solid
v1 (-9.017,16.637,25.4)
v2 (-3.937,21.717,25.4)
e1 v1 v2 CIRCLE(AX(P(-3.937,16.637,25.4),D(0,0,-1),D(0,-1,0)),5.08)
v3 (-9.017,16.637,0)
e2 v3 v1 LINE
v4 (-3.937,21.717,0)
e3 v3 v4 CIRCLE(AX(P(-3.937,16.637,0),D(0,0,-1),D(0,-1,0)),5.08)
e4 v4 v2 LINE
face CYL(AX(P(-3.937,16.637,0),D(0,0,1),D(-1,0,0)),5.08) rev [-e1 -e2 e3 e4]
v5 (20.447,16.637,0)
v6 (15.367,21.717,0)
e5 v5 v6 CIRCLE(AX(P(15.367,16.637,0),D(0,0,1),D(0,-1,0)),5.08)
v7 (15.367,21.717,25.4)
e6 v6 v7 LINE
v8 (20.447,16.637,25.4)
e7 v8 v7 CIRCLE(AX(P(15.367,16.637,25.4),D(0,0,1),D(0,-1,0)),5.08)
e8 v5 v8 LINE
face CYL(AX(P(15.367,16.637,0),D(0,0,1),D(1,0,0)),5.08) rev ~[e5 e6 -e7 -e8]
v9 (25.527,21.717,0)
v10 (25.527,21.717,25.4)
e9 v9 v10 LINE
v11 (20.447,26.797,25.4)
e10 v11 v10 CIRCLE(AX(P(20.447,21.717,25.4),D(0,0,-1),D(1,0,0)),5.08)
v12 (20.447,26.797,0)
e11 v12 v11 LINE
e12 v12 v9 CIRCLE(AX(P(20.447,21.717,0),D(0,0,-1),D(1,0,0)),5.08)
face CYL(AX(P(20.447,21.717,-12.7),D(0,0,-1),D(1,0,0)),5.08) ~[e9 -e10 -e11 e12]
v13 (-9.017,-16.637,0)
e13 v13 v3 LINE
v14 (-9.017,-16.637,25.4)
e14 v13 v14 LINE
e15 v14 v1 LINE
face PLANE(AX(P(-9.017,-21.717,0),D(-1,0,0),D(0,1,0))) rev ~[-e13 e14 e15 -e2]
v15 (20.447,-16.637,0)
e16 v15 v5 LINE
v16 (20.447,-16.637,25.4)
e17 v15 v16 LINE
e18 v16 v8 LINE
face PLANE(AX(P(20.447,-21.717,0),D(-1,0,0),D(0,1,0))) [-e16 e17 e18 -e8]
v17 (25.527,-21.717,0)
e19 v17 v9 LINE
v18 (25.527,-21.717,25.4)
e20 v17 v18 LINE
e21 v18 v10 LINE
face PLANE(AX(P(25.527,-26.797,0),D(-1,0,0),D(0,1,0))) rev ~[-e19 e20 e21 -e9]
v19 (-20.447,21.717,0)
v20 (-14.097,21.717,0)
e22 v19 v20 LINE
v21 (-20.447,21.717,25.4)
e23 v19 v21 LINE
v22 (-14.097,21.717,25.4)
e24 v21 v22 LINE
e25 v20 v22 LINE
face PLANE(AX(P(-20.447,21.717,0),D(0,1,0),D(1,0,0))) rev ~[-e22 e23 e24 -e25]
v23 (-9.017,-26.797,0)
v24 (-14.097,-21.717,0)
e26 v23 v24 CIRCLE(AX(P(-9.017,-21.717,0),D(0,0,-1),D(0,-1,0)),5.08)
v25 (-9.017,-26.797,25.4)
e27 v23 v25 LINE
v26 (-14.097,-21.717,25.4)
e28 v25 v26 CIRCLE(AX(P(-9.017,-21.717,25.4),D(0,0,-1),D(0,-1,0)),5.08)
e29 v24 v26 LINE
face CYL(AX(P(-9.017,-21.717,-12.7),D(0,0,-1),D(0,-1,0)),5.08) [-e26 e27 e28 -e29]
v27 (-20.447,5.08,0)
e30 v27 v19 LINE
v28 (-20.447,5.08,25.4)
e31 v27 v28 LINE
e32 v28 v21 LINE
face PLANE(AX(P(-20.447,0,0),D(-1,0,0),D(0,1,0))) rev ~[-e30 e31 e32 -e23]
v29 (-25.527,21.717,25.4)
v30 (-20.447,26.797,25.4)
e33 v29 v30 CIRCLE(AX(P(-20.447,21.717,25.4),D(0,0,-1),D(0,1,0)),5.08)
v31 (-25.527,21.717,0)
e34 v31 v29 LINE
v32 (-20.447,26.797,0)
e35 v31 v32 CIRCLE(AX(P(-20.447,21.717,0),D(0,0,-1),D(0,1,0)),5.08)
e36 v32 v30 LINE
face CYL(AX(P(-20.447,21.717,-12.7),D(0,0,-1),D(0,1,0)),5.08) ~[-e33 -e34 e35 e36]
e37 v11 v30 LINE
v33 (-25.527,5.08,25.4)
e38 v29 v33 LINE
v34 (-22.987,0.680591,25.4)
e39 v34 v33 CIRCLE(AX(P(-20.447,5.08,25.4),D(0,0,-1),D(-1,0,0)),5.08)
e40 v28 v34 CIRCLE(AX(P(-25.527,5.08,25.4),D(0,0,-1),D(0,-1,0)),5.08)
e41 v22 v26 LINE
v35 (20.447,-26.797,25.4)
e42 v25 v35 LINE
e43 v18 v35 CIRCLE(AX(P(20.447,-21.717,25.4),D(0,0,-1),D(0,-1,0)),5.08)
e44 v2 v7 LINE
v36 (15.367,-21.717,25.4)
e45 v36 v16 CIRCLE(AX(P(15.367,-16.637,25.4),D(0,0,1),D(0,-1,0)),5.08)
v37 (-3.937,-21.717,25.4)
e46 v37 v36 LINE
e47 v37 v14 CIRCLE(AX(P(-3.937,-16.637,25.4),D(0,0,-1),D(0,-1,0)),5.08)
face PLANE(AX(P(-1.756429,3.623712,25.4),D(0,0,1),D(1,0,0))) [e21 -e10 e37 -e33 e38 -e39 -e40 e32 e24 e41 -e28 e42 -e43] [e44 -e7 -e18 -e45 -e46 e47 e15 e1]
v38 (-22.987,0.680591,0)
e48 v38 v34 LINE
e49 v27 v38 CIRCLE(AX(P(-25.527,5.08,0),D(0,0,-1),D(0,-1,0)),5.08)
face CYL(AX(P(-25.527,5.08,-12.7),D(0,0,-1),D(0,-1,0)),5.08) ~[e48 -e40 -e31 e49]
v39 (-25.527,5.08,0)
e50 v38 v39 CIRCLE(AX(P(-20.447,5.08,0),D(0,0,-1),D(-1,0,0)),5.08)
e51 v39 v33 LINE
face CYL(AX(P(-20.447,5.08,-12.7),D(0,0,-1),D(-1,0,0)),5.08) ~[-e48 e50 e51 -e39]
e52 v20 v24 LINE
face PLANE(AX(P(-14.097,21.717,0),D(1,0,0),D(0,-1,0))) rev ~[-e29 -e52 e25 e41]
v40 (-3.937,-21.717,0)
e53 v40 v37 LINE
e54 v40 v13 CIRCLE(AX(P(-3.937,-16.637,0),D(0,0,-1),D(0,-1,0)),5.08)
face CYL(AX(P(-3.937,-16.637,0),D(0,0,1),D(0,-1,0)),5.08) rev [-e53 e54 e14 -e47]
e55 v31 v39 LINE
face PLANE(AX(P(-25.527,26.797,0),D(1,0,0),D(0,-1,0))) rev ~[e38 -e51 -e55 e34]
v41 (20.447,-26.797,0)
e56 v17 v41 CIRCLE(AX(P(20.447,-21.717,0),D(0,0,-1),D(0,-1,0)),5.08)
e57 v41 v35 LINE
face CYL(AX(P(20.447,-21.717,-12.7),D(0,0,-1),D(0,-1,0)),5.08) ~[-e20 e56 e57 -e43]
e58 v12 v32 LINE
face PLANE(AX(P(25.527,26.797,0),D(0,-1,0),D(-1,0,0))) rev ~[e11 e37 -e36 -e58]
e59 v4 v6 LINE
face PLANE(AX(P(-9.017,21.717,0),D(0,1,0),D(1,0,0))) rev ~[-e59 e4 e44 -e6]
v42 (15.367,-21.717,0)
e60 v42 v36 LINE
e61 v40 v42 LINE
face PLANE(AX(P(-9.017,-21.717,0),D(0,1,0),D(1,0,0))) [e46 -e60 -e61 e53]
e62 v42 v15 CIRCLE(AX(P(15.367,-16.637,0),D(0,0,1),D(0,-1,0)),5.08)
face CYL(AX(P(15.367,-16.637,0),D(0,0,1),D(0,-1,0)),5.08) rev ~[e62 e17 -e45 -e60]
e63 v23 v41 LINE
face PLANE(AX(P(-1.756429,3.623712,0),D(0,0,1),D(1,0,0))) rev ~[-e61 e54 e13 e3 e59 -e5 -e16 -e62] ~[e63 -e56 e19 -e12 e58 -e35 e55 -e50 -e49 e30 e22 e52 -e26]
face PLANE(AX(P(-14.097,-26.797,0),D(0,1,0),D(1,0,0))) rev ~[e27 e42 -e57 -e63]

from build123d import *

# Parameters (mm, degrees)
F0_W        = 29.464
F0_H        = 43.434
F1_DEPTH    = 25.4
F2_T1_DEPTH = 50.8
F3_R        = 5.08


# Not quite as in the source:
# - a fillet or chamfer that OpenCascade refuses, or shapes differently, is made with other operations: its cross-section is extruded or revolved along the edge and cut away or added


with BuildPart() as f1:
    # F0 (on Top) → F1 (new body)
    with BuildSketch(Plane.XY):
        Polygon((25.527, -26.797), (25.527, 26.797), (-25.527, 26.797), (-25.527, 0), (-20.447, 0), (-20.447, 21.717), (-14.097, 21.717), (-14.097, -26.797), align=None)
        with Locations((5.715, 0)):
            Rectangle(F0_W, F0_H, mode=Mode.SUBTRACT)
    extrude(amount=F1_DEPTH)

    # F2: fillet of radius 5.08 on 6 edges, made by hand

    # F2_s2 → F2_t1 (cut)
    with BuildSketch(Plane.XY.offset(-12.7)):
        with BuildLine():
            ThreePointArc((-20.447, 26.797), (-24.0391024484, 25.3091024484), (-25.527, 21.717))
            Line((-25.527, 21.717), (-25.527, 26.797))
            Line((-25.527, 26.797), (-20.447, 26.797))
        make_face()
        with BuildLine():
            ThreePointArc((25.527, 21.717), (24.0391024484, 25.3091024484), (20.447, 26.797))
            Line((20.447, 26.797), (25.527, 26.797))
            Line((25.527, 26.797), (25.527, 21.717))
        make_face()
        with BuildLine():
            ThreePointArc((-9.017, -26.797), (-12.6091024484, -25.3091024484), (-14.097, -21.717))
            Line((-14.097, -21.717), (-14.097, -26.797))
            Line((-14.097, -26.797), (-9.017, -26.797))
        make_face()
        with BuildLine():
            ThreePointArc((20.447, -26.797), (24.0391024484, -25.3091024484), (25.527, -21.717))
            Line((25.527, -21.717), (25.527, -26.797))
            Line((25.527, -26.797), (20.447, -26.797))
        make_face()
        with BuildLine():
            ThreePointArc((-25.527, 0), (-21.9348975516, 1.4878975516), (-20.447, 5.08))
            Line((-20.447, 5.08), (-20.447, 0))
            Line((-20.447, 0), (-25.527, 0))
        make_face()
        with BuildLine():
            ThreePointArc((-25.527, 5.08), (-24.0391024484, 1.4878975516), (-20.447, 0))
            Line((-20.447, 0), (-25.527, 0))
            Line((-25.527, 0), (-25.527, 5.08))
        make_face()
    extrude(amount=F2_T1_DEPTH, mode=Mode.SUBTRACT)

    # F3
    f3_edges = [f1.edges().sort_by_distance(p)[0] for p in [
        (-9.017, -21.717, 12.7),
        (20.447, -21.717, 12.7),
        (20.447, 21.717, 12.7),
        (-9.017, 21.717, 12.7),
    ]]
    fillet(f3_edges, radius=F3_R)


solid = f1.part
